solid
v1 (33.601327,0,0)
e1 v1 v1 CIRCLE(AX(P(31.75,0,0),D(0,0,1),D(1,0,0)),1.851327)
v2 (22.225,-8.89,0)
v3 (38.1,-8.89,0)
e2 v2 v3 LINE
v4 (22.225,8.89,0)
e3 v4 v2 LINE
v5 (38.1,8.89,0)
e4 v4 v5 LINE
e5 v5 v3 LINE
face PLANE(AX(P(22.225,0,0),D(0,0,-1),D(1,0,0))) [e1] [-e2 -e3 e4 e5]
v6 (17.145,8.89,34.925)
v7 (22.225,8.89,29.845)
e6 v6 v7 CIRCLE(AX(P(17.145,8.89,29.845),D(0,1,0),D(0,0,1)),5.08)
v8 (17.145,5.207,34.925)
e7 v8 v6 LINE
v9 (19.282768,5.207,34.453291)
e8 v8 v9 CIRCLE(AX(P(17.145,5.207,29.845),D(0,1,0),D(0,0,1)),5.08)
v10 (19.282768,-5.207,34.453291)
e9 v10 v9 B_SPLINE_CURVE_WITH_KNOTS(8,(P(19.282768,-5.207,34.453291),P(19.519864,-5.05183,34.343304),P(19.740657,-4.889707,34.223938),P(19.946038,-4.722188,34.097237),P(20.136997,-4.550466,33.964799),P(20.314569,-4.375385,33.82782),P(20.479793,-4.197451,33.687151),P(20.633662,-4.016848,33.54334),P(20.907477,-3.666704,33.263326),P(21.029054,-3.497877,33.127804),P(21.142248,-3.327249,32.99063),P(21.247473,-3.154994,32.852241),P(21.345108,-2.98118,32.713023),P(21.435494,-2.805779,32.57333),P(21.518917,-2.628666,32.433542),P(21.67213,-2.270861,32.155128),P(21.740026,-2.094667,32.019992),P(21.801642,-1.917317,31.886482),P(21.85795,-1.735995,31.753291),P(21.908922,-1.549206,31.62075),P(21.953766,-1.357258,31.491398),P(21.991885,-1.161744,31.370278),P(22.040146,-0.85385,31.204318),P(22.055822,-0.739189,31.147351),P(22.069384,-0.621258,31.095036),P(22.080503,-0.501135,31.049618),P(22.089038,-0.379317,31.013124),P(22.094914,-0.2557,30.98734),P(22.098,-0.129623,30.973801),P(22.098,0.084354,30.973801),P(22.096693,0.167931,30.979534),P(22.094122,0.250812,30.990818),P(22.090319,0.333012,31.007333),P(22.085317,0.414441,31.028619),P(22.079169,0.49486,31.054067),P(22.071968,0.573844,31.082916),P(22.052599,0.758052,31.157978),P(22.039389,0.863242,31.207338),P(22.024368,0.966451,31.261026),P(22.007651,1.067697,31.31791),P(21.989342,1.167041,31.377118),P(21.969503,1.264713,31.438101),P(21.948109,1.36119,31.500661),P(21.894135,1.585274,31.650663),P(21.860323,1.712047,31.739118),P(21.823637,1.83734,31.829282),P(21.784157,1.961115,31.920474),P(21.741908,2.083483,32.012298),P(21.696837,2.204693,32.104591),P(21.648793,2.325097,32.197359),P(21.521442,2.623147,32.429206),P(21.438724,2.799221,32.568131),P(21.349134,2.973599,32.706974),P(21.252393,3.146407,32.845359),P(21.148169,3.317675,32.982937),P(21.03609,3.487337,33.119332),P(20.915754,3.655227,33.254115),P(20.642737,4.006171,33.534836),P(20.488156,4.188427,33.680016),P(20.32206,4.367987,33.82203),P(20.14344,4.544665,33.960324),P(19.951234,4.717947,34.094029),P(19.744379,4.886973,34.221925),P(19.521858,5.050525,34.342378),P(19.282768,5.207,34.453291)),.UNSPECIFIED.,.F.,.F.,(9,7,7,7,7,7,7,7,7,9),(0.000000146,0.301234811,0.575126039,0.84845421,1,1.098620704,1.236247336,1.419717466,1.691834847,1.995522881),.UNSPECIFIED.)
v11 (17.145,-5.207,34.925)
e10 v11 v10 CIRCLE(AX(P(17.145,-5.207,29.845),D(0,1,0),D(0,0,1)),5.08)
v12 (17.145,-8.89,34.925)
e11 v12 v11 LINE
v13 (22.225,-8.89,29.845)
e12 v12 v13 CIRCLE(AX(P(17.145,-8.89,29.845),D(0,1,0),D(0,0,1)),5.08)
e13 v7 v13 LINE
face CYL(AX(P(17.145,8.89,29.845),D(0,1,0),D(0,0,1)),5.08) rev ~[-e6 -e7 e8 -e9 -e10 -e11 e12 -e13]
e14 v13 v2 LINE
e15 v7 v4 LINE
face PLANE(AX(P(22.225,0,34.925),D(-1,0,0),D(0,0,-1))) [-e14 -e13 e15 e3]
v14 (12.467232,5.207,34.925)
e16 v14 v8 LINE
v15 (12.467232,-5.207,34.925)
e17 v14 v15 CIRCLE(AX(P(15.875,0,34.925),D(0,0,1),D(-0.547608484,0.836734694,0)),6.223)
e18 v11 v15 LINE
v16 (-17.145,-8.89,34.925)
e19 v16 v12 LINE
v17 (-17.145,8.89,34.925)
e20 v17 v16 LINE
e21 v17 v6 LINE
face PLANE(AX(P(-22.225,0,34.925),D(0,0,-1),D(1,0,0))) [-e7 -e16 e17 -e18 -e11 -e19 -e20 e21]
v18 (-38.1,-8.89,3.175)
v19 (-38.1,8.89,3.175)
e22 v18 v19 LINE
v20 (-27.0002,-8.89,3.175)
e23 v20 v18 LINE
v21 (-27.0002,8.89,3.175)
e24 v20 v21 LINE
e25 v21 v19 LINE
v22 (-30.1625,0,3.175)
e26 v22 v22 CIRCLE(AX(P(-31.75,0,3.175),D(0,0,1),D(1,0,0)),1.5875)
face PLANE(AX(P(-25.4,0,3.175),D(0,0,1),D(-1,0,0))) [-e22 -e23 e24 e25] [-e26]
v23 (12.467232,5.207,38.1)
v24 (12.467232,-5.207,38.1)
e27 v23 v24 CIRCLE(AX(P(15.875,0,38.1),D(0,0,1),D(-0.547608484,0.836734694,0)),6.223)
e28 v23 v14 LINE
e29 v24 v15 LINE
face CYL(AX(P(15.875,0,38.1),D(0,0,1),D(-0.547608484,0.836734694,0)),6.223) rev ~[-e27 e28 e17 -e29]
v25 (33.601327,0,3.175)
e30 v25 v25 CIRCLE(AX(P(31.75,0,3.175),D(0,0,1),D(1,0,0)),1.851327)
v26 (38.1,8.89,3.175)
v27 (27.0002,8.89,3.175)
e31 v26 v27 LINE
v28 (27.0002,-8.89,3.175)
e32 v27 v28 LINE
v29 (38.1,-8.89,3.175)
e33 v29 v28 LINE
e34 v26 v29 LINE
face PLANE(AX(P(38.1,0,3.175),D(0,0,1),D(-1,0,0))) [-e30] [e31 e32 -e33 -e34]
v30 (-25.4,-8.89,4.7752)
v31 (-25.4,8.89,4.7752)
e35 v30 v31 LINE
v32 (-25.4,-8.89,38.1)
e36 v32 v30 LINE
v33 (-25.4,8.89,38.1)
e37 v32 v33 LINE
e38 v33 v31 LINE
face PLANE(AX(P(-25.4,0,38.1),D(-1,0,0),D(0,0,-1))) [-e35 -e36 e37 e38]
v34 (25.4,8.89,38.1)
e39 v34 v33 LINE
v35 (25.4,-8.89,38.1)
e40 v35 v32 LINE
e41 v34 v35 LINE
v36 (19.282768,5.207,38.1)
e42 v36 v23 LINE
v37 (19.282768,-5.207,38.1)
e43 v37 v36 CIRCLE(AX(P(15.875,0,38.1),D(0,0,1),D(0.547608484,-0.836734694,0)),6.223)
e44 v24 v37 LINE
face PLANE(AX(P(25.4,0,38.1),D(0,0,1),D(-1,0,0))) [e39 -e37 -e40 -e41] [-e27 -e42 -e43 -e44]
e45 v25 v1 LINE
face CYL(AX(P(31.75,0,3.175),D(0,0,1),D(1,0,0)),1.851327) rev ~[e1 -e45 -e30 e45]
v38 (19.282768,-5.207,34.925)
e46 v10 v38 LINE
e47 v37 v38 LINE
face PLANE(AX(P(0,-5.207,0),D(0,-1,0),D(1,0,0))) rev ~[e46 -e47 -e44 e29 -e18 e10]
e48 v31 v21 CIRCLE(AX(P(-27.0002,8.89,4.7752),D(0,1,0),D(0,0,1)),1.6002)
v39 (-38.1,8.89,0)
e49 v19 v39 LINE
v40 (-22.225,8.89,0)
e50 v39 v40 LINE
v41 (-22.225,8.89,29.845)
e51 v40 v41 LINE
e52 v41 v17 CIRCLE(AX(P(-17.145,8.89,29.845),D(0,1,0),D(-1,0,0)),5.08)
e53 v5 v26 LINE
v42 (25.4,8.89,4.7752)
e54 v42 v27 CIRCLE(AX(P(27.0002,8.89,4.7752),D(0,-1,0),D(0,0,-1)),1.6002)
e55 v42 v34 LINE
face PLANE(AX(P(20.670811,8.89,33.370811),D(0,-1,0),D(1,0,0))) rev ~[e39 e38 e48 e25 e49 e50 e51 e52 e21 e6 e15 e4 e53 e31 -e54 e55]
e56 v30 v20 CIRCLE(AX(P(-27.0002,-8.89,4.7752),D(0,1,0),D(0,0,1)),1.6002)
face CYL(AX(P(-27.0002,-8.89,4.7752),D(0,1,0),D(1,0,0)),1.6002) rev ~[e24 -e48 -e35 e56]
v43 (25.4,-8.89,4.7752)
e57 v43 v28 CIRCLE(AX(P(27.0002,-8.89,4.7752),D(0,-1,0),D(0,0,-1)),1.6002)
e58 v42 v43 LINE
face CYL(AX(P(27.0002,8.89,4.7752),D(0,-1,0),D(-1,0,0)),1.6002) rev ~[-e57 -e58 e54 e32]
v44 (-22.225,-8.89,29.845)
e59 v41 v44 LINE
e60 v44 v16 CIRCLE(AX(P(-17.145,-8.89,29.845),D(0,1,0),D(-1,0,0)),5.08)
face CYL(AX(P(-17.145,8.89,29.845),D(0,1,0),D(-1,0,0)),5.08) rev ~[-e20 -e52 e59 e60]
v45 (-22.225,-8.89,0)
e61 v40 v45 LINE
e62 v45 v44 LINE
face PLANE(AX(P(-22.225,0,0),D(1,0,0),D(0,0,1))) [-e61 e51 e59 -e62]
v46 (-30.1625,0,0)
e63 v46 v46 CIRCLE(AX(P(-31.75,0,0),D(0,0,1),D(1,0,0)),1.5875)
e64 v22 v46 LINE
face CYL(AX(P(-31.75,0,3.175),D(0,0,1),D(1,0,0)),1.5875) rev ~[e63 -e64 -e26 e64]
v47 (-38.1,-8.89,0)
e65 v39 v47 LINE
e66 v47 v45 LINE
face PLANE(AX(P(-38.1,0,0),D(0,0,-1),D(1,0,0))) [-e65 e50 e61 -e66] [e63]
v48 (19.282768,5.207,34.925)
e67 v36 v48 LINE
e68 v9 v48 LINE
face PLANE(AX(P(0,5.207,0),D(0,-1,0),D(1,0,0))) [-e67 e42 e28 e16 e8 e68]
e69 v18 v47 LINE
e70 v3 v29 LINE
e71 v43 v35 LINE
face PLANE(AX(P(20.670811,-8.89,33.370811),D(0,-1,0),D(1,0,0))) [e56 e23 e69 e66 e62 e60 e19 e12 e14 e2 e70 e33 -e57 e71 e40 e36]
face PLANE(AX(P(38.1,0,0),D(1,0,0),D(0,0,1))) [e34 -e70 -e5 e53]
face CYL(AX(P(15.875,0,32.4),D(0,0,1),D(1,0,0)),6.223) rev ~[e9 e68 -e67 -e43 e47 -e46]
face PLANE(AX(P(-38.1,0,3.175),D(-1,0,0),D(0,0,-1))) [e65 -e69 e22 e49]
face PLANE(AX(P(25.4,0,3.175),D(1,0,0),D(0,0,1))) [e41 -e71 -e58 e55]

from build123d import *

# Parameters (mm, degrees)
F1_DEPTH     = 8.89
F2_R         = 1.5875
F2_R_2       = 1.8513271914
F3_DEPTH     = 3.176
F5_DEPTH     = 38.101
F6_T1_DEPTH  = 17.78
F6_T6_DEPTH  = 17.78
F6_S8_R      = 6.223
F6_T9_DEPTH  = 11
F6_T13_DEPTH = 17.78
F6_S16_R     = 6.223
F6_T17_DEPTH = 11
F6_T21_DEPTH = 17.78
F6_S23_R     = 6.223
F6_T24_DEPTH = 11
F6_T28_DEPTH = 17.78
F6_S30_R     = 6.223
F6_T31_DEPTH = 11
F6_T35_DEPTH = 17.78
F6_S37_R     = 6.223
F6_T38_DEPTH = 11
F7_R         = 1.6002


# Not quite as in the source:
# - a fillet or chamfer that OpenCascade refuses, or shapes differently, is made with other operations: its cross-section is extruded or revolved along the edge and cut away or added


with BuildPart() as f1:
    # F0 (on Front) → F1 (new body, symmetric)
    with BuildSketch(Plane.XZ):
        Polygon((-38.1, 3.175), (-38.1, 0), (-22.225, 0), (-22.225, 34.925), (22.225, 34.925), (22.225, 0), (38.1, 0), (38.1, 3.175), (25.4, 3.175), (25.4, 38.1), (-25.4, 38.1), (-25.4, 3.175), align=None)
    extrude(amount=F1_DEPTH, both=True)

    # F2 (on face) → F3 (cut, through all)
    with BuildSketch(Plane.XY.offset(3.175)):
        with Locations((-31.75, 0)):
            Circle(F2_R)
        with Locations((31.75, 0)):
            Circle(F2_R_2)
    extrude(amount=-F3_DEPTH, mode=Mode.SUBTRACT)

    # F4 (on face) → F5 (cut, through all)
    with BuildSketch(Plane.XY.offset(38.1)):
        with BuildLine():
            Line((19.2827675977, 5.207), (12.4672324023, 5.207))
            ThreePointArc((12.4672324023, 5.207), (9.652, 0), (12.4672324023, -5.207))
            Line((12.4672324023, -5.207), (19.2827675977, -5.207))
            ThreePointArc((19.2827675977, -5.207), (22.098, 0), (19.2827675977, 5.207))
        make_face()
    extrude(amount=-F5_DEPTH, mode=Mode.SUBTRACT)

    # F6: fillet of radius 5.08 on 2 edges, made by hand

    # F6_s2 → F6_t1 (join)
    with BuildSketch(Plane.XZ.offset(-8.89)):
        with BuildLine():
            ThreePointArc((-22.225, 29.845), (-20.7371024484, 33.4371024484), (-17.145, 34.925))
            Line((-17.145, 34.925), (-22.225, 34.925))
            Line((-22.225, 34.925), (-22.225, 29.845))
        make_face()
    extrude(amount=F6_T1_DEPTH)


with BuildPart() as f6_tool4:
    # F6_s5 → F6_t6 (new body)
    with BuildSketch(Plane.XZ.offset(-8.89)):
        with BuildLine():
            ThreePointArc((17.145, 34.925), (20.7371024484, 33.4371024484), (22.225, 29.845))
            Line((22.225, 29.845), (22.225, 34.925))
            Line((22.225, 34.925), (17.145, 34.925))
        make_face()
    extrude(amount=F6_T6_DEPTH)

    split(bisect_by=Plane.XZ.offset(-5.207), keep=Keep.BOTTOM)

    # F6_s8 → F6_t9 (cut, symmetric)
    with BuildSketch(Plane.XY.offset(32.4)):
        with Locations((15.875, 0)):
            Circle(F6_S8_R)
    extrude(amount=F6_T9_DEPTH, both=True, mode=Mode.SUBTRACT)


with BuildPart() as f1_1:
    add(f1.part)

    # F6_t3: union F6_tool4
    add(f6_tool4.part)


with BuildPart() as f6_tool11:
    # F6_s12 → F6_t13 (new body)
    with BuildSketch(Plane.XZ.offset(-8.89)):
        with BuildLine():
            ThreePointArc((17.145, 34.925), (20.7371024484, 33.4371024484), (22.225, 29.845))
            Line((22.225, 29.845), (22.225, 34.925))
            Line((22.225, 34.925), (17.145, 34.925))
        make_face()
    extrude(amount=F6_T13_DEPTH)

    split(bisect_by=Plane.XZ.offset(5.207), keep=Keep.BOTTOM)

    split(bisect_by=Plane.XZ.offset(-5.207), keep=Keep.TOP)

    # F6_s16 → F6_t17 (cut, symmetric)
    with BuildSketch(Plane.XY.offset(32.4)):
        with Locations((15.875, 0)):
            Circle(F6_S16_R)
    extrude(amount=F6_T17_DEPTH, both=True, mode=Mode.SUBTRACT)


with BuildPart() as f1_2:
    add(f1_1.part)

    # F6_t10: union F6_tool11
    add(f6_tool11.part)


with BuildPart() as f6_tool19:
    # F6_s20 → F6_t21 (new body)
    with BuildSketch(Plane.XZ.offset(-8.89)):
        with BuildLine():
            ThreePointArc((17.145, 34.925), (20.7371024484, 33.4371024484), (22.225, 29.845))
            Line((22.225, 29.845), (22.225, 34.925))
            Line((22.225, 34.925), (17.145, 34.925))
        make_face()
    extrude(amount=F6_T21_DEPTH)

    split(bisect_by=Plane.XZ.offset(-5.207), keep=Keep.BOTTOM)

    # F6_s23 → F6_t24 (intersect, symmetric)
    with BuildSketch(Plane.XY.offset(32.4)):
        with Locations((15.875, 0)):
            Circle(F6_S23_R)
    extrude(amount=F6_T24_DEPTH, both=True, mode=Mode.INTERSECT)


with BuildPart() as f1_3:
    add(f1_2.part)

    # F6_t18: union F6_tool19
    add(f6_tool19.part)


with BuildPart() as f6_tool26:
    # F6_s27 → F6_t28 (new body)
    with BuildSketch(Plane.XZ.offset(-8.89)):
        with BuildLine():
            ThreePointArc((17.145, 34.925), (20.7371024484, 33.4371024484), (22.225, 29.845))
            Line((22.225, 29.845), (22.225, 34.925))
            Line((22.225, 34.925), (17.145, 34.925))
        make_face()
    extrude(amount=F6_T28_DEPTH)

    split(bisect_by=Plane.XZ.offset(5.207), keep=Keep.TOP)

    # F6_s30 → F6_t31 (cut, symmetric)
    with BuildSketch(Plane.XY.offset(32.4)):
        with Locations((15.875, 0)):
            Circle(F6_S30_R)
    extrude(amount=F6_T31_DEPTH, both=True, mode=Mode.SUBTRACT)


with BuildPart() as f1_4:
    add(f1_3.part)

    # F6_t25: union F6_tool26
    add(f6_tool26.part)


with BuildPart() as f6_tool33:
    # F6_s34 → F6_t35 (new body)
    with BuildSketch(Plane.XZ.offset(-8.89)):
        with BuildLine():
            ThreePointArc((17.145, 34.925), (20.7371024484, 33.4371024484), (22.225, 29.845))
            Line((22.225, 29.845), (22.225, 34.925))
            Line((22.225, 34.925), (17.145, 34.925))
        make_face()
    extrude(amount=F6_T35_DEPTH)

    split(bisect_by=Plane.XZ.offset(5.207), keep=Keep.TOP)

    # F6_s37 → F6_t38 (intersect, symmetric)
    with BuildSketch(Plane.XY.offset(32.4)):
        with Locations((15.875, 0)):
            Circle(F6_S37_R)
    extrude(amount=F6_T38_DEPTH, both=True, mode=Mode.INTERSECT)


with BuildPart() as f1_5:
    add(f1_4.part)

    # F6_t32: union F6_tool33
    add(f6_tool33.part)

    # F7
    f7_edges = [f1_5.edges().sort_by_distance(p)[0] for p in [
        (-25.4, 0, 3.175),
        (25.4, 0, 3.175),
    ]]
    fillet(f7_edges, radius=F7_R)


solid = f1_5.part
